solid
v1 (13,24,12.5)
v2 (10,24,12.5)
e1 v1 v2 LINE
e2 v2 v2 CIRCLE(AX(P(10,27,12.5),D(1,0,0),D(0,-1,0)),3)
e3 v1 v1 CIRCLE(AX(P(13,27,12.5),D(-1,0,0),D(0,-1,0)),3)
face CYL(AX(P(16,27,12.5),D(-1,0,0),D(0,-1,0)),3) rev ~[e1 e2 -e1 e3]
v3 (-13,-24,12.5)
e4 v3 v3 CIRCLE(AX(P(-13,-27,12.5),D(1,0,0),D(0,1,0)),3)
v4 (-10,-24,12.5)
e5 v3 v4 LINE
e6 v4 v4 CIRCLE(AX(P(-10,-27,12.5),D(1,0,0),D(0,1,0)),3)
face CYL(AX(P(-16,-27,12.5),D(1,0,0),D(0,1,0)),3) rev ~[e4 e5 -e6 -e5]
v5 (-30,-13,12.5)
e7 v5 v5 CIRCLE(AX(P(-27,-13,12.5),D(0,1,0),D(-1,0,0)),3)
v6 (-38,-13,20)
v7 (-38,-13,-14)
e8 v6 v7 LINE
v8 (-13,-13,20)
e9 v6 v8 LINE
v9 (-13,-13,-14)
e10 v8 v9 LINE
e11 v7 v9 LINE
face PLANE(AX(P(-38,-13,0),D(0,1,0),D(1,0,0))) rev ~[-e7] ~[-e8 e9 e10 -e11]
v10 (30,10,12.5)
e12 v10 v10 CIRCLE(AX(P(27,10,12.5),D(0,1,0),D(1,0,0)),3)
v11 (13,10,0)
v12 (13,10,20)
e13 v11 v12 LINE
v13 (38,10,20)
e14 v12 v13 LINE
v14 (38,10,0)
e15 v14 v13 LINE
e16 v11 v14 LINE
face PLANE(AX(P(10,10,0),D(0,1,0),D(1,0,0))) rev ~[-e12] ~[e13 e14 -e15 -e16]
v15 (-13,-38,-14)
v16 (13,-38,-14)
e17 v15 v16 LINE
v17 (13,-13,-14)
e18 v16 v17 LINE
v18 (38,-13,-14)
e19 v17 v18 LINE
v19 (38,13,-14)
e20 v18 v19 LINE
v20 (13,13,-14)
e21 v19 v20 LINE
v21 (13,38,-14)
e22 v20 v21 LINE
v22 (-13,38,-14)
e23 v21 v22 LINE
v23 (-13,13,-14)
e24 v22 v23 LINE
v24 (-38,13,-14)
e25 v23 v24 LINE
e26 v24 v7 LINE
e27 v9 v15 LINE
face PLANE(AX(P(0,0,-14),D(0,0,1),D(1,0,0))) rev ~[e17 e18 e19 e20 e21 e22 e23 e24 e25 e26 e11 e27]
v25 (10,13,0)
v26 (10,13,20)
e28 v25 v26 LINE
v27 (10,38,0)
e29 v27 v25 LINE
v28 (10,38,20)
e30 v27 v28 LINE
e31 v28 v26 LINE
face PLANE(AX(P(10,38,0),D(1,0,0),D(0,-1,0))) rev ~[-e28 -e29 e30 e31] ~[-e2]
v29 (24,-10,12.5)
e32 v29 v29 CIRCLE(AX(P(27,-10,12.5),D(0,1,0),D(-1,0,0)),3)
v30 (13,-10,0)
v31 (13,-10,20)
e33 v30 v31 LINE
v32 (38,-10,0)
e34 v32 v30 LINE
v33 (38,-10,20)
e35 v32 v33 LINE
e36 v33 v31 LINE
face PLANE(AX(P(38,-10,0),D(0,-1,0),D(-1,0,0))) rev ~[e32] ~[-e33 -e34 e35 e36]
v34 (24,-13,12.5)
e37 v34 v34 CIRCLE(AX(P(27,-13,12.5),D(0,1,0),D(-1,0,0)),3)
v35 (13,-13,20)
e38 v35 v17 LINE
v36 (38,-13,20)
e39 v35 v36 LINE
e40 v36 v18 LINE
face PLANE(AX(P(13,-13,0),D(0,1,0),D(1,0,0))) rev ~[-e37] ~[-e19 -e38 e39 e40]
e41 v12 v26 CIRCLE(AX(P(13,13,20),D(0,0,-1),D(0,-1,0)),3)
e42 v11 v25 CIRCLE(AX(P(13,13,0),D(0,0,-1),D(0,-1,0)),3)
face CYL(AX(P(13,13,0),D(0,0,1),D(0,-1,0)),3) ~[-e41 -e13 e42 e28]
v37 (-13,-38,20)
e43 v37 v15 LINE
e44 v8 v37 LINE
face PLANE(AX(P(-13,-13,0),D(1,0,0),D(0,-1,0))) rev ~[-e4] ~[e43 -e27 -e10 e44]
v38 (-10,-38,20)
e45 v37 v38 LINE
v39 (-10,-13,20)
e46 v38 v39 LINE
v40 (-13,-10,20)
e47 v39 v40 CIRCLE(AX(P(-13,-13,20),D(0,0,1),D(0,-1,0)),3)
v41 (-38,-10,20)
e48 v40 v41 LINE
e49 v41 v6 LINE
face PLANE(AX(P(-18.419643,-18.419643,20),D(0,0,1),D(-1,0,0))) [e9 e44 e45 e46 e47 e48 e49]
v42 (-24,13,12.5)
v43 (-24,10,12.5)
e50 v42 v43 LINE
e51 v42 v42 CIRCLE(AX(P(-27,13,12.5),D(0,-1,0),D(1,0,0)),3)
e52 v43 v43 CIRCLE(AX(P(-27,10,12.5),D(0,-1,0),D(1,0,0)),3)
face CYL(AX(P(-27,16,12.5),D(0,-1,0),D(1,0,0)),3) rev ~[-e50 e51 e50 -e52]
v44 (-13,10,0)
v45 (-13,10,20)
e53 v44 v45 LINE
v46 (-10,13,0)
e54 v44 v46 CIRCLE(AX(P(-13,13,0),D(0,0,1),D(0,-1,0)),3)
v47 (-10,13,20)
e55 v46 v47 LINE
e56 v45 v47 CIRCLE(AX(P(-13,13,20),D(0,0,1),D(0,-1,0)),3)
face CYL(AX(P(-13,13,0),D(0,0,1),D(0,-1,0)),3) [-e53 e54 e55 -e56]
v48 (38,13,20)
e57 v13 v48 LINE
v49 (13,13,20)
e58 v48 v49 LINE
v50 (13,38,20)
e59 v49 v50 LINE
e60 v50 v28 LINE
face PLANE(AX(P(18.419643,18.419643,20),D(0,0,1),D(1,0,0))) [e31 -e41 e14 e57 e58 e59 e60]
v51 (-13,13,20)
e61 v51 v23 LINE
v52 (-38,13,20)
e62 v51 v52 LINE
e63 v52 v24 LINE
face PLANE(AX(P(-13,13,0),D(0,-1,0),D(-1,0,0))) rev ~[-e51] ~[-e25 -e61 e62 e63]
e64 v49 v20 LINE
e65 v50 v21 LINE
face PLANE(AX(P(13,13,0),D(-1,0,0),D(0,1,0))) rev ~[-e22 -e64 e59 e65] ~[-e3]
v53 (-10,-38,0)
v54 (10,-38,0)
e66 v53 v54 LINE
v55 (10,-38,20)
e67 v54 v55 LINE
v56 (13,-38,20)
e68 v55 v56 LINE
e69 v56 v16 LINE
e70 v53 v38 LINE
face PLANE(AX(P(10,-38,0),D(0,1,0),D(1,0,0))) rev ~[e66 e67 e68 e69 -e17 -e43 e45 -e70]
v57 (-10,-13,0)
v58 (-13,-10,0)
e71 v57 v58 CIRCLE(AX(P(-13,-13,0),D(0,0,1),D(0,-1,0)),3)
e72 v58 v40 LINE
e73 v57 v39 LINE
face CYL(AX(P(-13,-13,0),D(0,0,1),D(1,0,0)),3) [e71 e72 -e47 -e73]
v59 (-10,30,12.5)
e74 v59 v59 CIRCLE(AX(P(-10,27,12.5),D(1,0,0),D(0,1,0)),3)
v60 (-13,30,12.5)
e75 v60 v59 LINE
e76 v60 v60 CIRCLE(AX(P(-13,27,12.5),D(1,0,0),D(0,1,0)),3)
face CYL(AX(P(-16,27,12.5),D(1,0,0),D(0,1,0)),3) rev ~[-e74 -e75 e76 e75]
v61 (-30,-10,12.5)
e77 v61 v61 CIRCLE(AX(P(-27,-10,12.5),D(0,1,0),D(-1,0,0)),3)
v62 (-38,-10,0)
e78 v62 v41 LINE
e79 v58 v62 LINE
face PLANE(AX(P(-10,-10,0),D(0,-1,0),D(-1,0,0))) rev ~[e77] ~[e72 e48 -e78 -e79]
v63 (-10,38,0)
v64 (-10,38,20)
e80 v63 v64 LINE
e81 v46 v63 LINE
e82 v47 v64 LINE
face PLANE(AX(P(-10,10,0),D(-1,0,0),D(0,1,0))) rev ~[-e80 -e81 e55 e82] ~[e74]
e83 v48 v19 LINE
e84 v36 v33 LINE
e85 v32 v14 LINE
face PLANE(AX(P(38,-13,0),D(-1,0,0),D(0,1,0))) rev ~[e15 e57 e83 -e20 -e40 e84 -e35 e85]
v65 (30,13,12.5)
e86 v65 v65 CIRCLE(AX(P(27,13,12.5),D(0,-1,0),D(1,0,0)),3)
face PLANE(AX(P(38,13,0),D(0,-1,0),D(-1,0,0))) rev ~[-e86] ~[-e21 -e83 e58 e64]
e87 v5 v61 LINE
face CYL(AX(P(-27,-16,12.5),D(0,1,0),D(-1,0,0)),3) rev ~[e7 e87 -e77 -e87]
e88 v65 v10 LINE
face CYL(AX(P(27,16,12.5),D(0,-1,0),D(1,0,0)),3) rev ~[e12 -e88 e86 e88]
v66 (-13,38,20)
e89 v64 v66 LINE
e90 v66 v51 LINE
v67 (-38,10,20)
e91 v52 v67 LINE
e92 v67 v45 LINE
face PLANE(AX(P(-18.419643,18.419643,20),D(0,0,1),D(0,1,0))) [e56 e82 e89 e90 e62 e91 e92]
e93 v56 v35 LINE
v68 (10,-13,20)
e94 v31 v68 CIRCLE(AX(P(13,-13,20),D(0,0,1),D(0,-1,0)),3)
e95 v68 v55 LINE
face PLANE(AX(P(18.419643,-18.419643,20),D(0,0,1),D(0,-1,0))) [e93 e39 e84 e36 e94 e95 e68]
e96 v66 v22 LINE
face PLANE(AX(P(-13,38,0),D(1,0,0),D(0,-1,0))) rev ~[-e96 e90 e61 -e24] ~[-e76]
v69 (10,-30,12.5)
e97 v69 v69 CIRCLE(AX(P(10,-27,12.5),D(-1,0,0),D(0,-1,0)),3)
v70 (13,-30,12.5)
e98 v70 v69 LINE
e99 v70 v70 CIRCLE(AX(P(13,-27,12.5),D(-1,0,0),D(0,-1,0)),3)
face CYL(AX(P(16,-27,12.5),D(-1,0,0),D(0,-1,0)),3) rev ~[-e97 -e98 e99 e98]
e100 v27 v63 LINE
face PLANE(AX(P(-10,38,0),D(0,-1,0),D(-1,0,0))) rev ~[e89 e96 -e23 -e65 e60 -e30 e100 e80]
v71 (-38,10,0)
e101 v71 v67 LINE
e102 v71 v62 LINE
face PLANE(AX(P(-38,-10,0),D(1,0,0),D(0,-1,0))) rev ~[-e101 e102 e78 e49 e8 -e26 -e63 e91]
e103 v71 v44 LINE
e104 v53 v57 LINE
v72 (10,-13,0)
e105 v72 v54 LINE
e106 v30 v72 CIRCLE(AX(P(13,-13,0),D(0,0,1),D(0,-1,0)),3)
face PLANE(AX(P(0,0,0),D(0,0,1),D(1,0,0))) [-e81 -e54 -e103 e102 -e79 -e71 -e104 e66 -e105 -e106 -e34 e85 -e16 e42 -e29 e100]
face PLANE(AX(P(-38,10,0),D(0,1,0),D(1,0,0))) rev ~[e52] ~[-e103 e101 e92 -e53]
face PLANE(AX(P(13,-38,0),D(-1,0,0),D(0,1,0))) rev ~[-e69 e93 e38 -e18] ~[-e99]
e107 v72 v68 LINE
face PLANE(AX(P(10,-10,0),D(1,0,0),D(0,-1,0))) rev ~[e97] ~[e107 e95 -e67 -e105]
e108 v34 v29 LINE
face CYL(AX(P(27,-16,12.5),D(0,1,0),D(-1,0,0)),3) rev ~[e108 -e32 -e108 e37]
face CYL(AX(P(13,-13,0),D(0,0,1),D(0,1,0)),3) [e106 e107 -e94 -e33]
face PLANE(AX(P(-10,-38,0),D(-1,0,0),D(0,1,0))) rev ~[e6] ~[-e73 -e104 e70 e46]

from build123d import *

# Parameters (mm, degrees)
F3_DEPTH              = 14
F5_DEPTH              = 20
F5_COPIES_COUNT       = 4
F8_D                  = 6
F8_DEPTH              = 3
F8_TIP                = 1.8025818571
F8_ON_F6_D            = 6
F8_ON_F6_DEPTH        = 3
F8_ON_F6_TIP          = 1.8025818571
F8_COPIES_COUNT       = 4
F8_ON_F6_COPIES_COUNT = 4
F9_R                  = 3


# Not quite as in the source:
# - a pattern or mirror of a feature is missing from the dataset's text; its kind, count and spacing are read off the source's solid


with BuildPart() as f3:
    # F2 (on Top) → F3 (new body)
    with BuildSketch(Plane.XY):
        Polygon((-13, 38), (-13, 13), (-38, 13), (-38, -13), (-13, -13), (-13, -38), (13, -38), (13, -13), (38, -13), (38, 13), (13, 13), (13, 38), align=None)
    extrude(amount=-F3_DEPTH)

    # F4 (on Top) → F5 (join)
    with BuildSketch(Plane.XY):
        Polygon((13, 38), (10, 38), (10, 10), (38, 10), (38, 13), (13, 13), align=None)
    f5 = extrude(amount=F5_DEPTH)

    # F5_copies: F5 ×4 about axis
    f5_copies_axis = Axis((0, 0, 0), (0, 0, 1))
    for i in range(1, F5_COPIES_COUNT):
        add(f5.rotate(f5_copies_axis, i * 360 / F5_COPIES_COUNT))

    # F8
    with Locations(Plane.YZ.offset(13)):
        with Locations((27, 12.5)):
            f8 = Hole(F8_D / 2, depth=F8_DEPTH)
            with Locations((0, 0, -(F8_DEPTH + F8_TIP / 2))):  # 118° drill point
                Cone(0, F8_D / 2, F8_TIP, mode=Mode.SUBTRACT)

    # F8 on F6
    with Locations(Plane(origin=(0, 13, 0), x_dir=(-1, 0, 0), z_dir=(0, 1, 0))):
        with Locations((-27, 12.5)):
            f8_on_f6 = Hole(F8_ON_F6_D / 2, depth=F8_ON_F6_DEPTH)
            with Locations((0, 0, -(F8_ON_F6_DEPTH + F8_ON_F6_TIP / 2))):  # 118° drill point
                Cone(0, F8_ON_F6_D / 2, F8_ON_F6_TIP, mode=Mode.SUBTRACT)

    # F8_copies: F8 ×4 about axis
    f8_copies_axis = Axis((0, 0, 0), (0, 0, 1))
    for i in range(1, F8_COPIES_COUNT):
        add(f8.rotate(f8_copies_axis, i * 360 / F8_COPIES_COUNT), mode=Mode.SUBTRACT)

    # F8 on F6_copies: F8 on F6 ×4 about axis
    f8_on_f6_copies_axis = Axis((0, 0, 0), (0, 0, 1))
    for i in range(1, F8_ON_F6_COPIES_COUNT):
        add(f8_on_f6.rotate(f8_on_f6_copies_axis, i * 360 / F8_ON_F6_COPIES_COUNT), mode=Mode.SUBTRACT)

    # F9
    f9_edges = [f3.edges().sort_by_distance(p)[0] for p in [
        (10, 10, 10),
        (-10, 10, 10),
        (-10, -10, 10),
        (10, -10, 10),
    ]]
    fillet(f9_edges, radius=F9_R)


solid = f3.part
